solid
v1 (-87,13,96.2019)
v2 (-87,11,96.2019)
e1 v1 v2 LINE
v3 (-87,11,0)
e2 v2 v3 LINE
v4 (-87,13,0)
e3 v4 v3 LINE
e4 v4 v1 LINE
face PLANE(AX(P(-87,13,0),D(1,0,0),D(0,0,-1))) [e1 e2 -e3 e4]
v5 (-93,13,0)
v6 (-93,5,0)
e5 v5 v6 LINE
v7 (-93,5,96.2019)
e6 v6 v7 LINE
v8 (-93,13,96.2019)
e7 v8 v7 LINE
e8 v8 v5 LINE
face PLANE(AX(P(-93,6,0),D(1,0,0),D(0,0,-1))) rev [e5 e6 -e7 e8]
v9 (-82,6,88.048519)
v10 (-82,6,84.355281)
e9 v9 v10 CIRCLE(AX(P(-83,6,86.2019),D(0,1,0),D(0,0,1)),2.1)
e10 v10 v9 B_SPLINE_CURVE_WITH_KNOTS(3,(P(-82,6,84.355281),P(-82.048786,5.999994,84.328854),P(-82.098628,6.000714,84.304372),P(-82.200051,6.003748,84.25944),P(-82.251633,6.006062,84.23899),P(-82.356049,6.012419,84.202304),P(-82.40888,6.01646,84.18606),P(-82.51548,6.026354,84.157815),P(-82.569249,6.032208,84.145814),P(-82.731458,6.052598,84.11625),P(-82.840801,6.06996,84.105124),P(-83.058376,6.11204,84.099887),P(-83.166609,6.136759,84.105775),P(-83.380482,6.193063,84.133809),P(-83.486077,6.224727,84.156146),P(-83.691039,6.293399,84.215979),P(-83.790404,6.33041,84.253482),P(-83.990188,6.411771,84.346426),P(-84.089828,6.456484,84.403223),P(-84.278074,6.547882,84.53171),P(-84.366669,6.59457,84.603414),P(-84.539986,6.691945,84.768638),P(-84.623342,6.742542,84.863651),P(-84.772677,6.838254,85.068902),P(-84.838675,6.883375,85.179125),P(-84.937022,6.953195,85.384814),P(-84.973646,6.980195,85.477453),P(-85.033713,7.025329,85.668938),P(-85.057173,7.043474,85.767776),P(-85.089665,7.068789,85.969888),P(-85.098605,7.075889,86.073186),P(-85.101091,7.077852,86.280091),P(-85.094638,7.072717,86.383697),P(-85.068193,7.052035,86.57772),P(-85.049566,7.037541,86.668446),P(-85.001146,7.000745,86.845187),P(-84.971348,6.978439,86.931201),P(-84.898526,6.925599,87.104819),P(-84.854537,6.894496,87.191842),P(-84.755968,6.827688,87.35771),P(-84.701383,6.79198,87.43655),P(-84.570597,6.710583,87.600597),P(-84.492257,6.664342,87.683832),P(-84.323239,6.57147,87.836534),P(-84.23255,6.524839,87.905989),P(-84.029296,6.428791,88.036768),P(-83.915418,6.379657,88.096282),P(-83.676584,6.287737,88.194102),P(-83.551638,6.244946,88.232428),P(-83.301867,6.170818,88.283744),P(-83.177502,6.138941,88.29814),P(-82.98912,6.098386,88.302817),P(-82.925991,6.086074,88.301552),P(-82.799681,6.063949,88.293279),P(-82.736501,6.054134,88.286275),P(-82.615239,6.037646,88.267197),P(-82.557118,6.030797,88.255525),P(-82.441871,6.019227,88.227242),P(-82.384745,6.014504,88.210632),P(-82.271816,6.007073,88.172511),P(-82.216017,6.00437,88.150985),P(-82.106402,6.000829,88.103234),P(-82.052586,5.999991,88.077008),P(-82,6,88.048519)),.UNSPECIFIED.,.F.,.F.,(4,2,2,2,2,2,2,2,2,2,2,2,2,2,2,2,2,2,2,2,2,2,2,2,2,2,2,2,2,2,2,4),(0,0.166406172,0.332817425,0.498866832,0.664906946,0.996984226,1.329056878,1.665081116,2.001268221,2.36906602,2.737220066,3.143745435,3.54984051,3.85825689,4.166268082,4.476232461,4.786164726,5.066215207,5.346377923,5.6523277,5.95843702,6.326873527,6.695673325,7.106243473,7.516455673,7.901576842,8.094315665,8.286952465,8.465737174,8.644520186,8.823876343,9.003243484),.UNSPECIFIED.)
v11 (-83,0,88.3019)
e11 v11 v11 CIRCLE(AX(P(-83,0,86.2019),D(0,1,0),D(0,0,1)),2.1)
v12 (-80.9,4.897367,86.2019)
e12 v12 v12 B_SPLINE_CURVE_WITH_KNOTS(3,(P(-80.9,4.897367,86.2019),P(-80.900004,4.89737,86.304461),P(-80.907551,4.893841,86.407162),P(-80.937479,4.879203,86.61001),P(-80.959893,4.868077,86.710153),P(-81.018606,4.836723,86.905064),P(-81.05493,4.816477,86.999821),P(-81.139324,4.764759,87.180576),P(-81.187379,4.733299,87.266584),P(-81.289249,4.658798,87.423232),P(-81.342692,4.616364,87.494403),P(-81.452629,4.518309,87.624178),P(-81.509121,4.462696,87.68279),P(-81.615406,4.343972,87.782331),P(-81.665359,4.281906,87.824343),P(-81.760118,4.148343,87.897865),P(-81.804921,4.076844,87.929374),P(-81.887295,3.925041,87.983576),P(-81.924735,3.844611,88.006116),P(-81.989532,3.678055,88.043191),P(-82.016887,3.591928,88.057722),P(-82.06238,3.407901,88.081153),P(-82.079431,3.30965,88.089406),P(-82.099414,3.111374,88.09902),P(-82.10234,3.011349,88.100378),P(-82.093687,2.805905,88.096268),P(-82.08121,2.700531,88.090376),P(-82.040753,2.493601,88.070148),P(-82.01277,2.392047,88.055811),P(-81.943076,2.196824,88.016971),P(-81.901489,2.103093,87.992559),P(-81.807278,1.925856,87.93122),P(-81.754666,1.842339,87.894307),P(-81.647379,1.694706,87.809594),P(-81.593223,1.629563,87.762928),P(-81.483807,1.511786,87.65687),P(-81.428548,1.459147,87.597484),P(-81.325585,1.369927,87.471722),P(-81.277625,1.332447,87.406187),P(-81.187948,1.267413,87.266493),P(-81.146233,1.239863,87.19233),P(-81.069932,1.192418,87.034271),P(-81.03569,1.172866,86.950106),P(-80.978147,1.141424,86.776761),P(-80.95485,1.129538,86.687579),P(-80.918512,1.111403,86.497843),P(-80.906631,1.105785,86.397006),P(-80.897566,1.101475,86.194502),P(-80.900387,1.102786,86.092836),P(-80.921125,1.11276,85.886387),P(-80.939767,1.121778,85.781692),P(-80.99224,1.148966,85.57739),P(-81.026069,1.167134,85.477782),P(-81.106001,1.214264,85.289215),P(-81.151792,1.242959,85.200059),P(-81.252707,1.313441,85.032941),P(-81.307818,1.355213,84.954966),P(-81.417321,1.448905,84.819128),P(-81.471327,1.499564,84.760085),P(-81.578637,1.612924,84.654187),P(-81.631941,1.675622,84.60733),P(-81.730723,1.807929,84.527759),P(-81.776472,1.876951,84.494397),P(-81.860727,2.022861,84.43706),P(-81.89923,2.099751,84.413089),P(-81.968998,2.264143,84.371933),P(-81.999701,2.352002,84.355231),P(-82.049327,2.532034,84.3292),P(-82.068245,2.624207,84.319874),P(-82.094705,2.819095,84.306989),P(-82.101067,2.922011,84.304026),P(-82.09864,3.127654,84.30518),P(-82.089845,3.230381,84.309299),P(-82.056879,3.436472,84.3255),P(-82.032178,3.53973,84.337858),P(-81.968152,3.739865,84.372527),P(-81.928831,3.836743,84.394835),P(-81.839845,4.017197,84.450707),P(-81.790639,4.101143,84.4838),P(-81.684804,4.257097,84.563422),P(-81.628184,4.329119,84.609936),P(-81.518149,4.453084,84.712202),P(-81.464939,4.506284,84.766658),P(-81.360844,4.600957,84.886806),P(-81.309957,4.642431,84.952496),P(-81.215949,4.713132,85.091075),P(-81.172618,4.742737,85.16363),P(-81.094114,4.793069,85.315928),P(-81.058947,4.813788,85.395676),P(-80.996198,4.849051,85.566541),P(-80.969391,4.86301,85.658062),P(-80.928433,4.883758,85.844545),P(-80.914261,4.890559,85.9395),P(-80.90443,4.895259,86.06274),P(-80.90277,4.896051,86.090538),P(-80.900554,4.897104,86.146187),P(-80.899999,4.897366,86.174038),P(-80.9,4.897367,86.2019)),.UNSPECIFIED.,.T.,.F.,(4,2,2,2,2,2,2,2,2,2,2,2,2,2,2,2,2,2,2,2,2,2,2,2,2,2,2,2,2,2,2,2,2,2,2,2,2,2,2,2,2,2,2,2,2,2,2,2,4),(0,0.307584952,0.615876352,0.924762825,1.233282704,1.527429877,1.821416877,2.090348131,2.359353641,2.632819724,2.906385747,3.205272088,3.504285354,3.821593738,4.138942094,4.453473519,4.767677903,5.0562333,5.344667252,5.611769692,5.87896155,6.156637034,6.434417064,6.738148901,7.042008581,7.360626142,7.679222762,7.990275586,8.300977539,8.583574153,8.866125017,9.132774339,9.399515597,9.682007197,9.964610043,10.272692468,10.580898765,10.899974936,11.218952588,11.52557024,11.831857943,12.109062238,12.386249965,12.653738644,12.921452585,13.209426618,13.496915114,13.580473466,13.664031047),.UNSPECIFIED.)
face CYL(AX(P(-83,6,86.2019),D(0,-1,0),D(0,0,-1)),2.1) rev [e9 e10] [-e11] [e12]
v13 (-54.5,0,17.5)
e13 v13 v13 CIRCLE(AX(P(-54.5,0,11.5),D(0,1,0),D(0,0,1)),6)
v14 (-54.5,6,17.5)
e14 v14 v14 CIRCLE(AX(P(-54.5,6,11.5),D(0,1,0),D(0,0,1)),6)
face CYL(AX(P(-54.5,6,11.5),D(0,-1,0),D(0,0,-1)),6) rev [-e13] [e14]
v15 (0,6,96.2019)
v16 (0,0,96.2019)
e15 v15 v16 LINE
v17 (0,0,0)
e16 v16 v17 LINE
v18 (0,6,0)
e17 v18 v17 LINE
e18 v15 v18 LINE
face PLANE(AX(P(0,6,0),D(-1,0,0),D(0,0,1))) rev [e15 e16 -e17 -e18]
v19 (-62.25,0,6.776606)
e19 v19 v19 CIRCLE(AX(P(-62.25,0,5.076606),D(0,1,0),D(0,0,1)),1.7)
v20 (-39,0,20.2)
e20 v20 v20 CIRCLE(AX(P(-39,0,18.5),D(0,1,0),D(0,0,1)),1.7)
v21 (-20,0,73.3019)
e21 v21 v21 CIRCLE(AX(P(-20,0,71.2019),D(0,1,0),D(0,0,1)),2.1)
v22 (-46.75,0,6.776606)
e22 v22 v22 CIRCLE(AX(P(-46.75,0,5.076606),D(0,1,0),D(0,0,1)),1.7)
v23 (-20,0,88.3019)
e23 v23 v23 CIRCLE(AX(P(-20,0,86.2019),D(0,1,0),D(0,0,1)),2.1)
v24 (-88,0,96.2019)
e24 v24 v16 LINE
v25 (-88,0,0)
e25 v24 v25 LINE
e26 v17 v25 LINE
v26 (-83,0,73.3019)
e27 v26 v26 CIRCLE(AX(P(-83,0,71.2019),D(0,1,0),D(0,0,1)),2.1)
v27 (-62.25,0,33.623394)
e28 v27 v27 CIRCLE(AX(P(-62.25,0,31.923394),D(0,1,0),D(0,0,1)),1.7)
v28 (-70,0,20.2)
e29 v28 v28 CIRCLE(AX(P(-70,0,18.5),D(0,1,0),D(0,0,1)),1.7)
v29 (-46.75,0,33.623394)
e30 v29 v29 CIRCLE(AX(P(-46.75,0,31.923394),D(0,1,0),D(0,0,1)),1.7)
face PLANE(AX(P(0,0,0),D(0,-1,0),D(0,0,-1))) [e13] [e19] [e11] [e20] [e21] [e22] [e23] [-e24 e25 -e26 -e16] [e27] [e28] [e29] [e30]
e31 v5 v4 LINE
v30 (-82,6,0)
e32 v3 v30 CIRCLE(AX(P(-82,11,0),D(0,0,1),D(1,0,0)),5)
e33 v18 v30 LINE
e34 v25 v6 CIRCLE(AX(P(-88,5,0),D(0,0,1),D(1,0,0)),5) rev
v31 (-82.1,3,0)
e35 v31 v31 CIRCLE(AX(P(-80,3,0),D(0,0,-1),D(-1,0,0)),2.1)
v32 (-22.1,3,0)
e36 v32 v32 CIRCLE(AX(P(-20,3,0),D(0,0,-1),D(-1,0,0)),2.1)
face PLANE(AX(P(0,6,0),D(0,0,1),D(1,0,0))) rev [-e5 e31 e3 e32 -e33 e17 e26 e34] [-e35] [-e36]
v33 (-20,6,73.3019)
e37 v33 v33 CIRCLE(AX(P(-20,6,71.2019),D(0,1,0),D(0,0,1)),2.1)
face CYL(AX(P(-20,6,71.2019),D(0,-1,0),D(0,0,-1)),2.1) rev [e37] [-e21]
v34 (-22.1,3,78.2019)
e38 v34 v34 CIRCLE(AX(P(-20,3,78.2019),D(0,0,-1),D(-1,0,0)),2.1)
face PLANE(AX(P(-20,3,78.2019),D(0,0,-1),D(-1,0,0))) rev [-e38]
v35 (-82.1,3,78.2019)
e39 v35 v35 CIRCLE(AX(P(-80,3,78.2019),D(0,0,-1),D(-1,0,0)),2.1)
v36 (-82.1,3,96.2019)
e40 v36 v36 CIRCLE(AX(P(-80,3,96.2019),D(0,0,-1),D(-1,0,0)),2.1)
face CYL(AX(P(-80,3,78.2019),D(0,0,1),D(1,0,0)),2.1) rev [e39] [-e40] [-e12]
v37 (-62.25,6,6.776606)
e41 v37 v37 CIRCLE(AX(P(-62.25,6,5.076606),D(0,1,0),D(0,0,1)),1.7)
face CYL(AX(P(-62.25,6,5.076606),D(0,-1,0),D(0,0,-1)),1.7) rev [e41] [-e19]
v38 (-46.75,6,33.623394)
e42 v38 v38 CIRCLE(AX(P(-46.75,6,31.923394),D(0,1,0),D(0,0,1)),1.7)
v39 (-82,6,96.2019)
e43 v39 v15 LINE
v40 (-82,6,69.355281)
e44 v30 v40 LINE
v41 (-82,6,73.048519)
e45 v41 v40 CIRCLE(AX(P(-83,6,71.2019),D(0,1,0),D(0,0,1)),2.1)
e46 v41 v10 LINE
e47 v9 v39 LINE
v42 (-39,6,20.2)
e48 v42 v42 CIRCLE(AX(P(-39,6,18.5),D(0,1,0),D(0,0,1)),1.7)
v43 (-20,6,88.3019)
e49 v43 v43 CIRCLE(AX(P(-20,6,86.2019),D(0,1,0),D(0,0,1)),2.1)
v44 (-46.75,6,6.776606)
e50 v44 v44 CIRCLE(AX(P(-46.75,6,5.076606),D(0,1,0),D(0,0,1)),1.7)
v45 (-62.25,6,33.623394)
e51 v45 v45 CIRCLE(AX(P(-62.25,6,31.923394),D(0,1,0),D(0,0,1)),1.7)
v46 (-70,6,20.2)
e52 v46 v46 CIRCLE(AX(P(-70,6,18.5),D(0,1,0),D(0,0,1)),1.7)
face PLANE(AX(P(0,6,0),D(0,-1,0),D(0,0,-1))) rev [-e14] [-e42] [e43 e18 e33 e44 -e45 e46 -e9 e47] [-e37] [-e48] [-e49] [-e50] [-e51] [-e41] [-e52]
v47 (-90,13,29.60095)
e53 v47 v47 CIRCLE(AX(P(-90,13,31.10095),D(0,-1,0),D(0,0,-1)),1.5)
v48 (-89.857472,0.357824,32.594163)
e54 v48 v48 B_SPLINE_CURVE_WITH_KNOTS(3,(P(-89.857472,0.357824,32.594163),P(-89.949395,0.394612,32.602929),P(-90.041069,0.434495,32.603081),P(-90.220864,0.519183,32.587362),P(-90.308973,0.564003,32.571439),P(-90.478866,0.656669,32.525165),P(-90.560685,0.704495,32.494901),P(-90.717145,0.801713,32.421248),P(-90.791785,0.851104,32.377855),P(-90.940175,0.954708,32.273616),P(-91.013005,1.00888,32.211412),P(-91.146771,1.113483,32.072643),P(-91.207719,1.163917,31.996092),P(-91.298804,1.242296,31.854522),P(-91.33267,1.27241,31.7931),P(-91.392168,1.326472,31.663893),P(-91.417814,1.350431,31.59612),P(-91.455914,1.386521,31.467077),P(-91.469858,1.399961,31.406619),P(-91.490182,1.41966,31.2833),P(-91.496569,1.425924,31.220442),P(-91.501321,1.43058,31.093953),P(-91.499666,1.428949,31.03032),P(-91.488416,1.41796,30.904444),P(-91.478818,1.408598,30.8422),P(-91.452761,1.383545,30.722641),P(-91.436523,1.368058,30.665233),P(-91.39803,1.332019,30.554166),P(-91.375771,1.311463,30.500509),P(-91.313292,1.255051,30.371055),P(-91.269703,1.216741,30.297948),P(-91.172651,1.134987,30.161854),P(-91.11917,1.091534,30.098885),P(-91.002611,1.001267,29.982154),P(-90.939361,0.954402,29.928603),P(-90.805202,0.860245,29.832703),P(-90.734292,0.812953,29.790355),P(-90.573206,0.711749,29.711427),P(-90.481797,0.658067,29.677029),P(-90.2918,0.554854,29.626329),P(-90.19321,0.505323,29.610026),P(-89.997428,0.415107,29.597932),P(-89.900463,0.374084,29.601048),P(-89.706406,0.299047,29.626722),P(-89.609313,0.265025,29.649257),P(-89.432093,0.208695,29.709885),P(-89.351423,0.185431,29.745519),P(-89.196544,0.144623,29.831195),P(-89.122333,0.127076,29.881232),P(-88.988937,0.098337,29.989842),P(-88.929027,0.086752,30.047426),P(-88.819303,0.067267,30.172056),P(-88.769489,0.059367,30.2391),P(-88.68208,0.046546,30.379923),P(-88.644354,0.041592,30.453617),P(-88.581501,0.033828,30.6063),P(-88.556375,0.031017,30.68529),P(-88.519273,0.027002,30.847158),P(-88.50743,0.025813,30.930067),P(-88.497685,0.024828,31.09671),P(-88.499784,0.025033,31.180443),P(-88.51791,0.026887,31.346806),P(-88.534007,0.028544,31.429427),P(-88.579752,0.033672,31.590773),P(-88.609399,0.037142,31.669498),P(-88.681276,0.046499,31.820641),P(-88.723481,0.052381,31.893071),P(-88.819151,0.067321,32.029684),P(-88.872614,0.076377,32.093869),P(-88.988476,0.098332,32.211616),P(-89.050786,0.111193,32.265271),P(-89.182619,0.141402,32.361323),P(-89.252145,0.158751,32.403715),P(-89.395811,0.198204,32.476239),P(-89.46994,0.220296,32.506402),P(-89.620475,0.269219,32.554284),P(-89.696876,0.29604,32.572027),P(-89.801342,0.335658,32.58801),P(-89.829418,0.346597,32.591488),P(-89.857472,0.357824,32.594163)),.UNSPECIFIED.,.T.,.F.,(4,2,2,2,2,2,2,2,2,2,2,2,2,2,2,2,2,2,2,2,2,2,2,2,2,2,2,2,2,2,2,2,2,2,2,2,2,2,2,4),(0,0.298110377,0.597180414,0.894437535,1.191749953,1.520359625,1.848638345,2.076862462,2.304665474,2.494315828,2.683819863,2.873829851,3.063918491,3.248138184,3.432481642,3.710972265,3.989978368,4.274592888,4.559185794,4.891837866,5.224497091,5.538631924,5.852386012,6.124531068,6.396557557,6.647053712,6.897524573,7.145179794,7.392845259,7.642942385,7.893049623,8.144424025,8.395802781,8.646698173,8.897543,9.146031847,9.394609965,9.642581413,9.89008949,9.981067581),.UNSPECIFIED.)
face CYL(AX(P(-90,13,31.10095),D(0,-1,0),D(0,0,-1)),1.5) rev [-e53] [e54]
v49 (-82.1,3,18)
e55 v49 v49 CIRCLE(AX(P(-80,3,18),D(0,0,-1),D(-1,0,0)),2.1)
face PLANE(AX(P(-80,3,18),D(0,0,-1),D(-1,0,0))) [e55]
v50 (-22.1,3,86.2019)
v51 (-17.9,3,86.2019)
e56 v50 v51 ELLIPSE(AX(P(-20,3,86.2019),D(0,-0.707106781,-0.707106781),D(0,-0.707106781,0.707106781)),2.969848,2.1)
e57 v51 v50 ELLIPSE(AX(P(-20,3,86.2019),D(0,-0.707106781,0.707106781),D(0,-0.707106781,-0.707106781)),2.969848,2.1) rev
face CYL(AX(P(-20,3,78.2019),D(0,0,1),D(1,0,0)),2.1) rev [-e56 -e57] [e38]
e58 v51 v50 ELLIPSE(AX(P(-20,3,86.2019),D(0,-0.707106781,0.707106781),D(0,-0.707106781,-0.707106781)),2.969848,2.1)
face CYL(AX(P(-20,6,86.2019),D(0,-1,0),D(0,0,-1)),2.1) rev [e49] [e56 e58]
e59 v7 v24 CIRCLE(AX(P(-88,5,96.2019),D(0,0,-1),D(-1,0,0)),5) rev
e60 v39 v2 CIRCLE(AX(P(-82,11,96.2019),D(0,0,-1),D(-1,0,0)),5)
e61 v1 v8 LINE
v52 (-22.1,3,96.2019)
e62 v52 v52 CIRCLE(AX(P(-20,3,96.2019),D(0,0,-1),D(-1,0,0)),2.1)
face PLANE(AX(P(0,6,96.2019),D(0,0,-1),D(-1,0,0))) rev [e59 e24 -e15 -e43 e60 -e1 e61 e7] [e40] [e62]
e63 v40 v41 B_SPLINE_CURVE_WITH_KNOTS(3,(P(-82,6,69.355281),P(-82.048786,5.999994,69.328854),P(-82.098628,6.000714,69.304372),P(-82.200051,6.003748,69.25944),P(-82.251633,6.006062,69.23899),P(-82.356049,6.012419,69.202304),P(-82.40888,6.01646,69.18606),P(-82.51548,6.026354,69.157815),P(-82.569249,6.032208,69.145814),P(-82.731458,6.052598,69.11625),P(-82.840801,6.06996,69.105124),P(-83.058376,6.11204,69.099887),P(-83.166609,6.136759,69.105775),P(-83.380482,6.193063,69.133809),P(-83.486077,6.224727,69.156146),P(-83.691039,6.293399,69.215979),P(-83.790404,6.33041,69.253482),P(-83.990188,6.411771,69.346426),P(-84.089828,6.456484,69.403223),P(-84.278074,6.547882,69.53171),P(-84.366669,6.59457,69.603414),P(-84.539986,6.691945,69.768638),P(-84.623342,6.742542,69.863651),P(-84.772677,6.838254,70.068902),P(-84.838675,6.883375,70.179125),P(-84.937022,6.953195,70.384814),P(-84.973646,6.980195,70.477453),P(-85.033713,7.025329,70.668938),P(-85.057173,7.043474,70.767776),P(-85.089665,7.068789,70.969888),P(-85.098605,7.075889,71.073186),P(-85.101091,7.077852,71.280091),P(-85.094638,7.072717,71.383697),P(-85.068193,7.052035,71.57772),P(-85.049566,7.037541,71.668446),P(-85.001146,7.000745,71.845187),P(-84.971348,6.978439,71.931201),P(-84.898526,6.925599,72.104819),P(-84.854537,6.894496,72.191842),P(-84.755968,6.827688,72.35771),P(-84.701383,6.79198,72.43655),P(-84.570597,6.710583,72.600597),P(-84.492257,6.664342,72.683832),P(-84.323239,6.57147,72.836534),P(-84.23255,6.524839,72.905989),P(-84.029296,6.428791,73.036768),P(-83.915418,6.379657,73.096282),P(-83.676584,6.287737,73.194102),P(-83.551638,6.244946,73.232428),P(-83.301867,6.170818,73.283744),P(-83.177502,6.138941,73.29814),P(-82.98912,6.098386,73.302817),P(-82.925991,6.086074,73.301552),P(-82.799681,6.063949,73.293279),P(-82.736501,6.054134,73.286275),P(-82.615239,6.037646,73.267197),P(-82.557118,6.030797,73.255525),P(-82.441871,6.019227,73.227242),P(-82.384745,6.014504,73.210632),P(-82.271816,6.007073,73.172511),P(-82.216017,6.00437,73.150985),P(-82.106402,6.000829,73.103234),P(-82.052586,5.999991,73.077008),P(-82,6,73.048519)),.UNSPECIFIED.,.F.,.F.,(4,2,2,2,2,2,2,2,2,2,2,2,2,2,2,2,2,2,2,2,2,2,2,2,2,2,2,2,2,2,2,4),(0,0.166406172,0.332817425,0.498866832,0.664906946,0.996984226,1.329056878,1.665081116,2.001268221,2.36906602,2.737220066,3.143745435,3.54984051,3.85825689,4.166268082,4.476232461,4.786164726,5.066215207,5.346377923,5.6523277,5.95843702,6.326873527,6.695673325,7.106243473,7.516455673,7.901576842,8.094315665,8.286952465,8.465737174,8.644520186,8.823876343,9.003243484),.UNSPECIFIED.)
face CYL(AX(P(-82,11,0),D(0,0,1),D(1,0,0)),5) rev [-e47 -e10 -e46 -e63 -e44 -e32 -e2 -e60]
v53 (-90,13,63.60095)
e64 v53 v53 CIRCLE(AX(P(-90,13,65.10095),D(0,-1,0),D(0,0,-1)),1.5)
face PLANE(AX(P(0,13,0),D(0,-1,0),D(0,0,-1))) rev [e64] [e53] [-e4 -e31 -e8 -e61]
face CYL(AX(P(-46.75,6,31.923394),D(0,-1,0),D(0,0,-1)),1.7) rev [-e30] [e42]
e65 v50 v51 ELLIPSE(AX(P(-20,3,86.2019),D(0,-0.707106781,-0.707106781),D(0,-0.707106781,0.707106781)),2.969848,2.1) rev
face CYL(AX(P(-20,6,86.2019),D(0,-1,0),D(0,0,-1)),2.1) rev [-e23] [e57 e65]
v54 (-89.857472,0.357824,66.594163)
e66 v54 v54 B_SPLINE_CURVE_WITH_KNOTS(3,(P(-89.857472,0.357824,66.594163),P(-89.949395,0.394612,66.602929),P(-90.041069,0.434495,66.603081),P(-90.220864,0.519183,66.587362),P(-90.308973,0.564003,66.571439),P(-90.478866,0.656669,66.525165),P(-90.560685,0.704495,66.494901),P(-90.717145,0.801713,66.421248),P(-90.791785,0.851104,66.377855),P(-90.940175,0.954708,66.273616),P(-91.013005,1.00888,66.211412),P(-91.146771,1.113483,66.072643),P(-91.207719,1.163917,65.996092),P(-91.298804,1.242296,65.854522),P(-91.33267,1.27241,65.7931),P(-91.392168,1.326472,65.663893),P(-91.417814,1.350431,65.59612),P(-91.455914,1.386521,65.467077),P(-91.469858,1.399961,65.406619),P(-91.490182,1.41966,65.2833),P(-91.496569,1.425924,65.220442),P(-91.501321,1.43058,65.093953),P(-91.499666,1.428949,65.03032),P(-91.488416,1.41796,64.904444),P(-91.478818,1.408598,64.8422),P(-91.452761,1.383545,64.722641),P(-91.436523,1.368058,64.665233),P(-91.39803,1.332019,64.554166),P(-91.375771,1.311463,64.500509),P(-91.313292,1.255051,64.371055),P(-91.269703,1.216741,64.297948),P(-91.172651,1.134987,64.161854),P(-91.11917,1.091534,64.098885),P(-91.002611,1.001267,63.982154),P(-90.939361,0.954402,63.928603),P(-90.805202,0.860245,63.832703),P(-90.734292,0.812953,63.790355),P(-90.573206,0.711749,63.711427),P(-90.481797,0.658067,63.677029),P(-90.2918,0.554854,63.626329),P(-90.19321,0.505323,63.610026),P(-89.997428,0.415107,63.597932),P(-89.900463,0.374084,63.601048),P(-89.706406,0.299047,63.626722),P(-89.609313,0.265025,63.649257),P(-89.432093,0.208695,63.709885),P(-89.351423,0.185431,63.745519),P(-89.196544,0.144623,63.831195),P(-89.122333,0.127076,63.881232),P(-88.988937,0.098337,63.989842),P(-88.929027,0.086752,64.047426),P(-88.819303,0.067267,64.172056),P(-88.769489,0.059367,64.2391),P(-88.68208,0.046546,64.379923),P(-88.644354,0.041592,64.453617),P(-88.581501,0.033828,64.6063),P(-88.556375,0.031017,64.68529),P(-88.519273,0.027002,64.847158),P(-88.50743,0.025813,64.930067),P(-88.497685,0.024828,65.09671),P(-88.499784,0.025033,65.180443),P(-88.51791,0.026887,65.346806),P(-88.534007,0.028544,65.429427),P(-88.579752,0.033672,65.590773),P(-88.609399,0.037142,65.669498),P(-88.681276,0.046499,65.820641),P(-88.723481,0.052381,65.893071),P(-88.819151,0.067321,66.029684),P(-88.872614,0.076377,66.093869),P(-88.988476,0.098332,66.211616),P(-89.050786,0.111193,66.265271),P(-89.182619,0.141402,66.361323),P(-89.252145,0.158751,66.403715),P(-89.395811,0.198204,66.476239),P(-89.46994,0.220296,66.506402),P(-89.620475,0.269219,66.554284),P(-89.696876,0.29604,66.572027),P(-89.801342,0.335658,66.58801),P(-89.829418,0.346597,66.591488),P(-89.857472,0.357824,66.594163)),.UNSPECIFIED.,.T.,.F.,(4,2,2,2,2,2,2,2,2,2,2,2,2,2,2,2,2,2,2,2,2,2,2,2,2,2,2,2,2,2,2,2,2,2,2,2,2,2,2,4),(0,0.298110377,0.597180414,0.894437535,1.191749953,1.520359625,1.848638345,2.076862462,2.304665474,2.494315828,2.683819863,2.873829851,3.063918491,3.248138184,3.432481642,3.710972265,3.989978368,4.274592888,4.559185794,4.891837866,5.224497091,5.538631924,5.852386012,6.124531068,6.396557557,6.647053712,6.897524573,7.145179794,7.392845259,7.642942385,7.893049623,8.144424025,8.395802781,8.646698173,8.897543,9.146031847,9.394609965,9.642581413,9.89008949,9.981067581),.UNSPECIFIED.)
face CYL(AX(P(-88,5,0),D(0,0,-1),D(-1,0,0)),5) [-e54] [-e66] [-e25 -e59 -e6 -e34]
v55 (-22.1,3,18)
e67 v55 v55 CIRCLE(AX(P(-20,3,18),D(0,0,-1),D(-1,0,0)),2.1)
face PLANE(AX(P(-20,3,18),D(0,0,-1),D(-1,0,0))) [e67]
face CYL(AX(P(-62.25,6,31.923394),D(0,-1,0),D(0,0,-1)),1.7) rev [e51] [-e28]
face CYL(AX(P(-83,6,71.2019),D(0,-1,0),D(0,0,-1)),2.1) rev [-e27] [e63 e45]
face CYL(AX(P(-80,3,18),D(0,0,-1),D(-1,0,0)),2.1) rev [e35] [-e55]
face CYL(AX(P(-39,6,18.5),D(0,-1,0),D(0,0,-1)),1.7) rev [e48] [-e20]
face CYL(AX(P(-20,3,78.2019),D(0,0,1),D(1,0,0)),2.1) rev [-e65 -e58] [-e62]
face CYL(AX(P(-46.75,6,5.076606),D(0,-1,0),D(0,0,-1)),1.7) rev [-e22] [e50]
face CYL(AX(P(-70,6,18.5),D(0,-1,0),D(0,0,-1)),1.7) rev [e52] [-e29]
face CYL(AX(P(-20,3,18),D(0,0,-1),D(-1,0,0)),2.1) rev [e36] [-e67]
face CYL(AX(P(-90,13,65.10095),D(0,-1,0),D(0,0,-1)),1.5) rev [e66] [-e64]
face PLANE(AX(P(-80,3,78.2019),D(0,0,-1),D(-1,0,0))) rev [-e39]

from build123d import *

# Parameters (mm, degrees)
SKETCH1_W           = 93
SKETCH1_H           = 96.2019
SKETCH1_R           = 6
SKETCH1_R_2         = 1.7
SKETCH1_R_3         = 2.1
BOSS_EXTRUDE1_DEPTH = 6
BOSS_EXTRUDE2_START = -6
SKETCH2_W           = 6
SKETCH2_H           = 96.2019
SKETCH2_R           = 1.5
BOSS_EXTRUDE2_DEPTH = 7
SKETCH2_3_R         = 1.5
CUT_EXTRUDE2_DEPTH  = 135.435135153
SKETCH3_R           = 2.1
CUT_EXTRUDE3_DEPTH  = 18
CUT_EXTRUDE4_START  = -78.2019
SKETCH3_2_R         = 2.1
CUT_EXTRUDE4_DEPTH  = 18
FILLET1_R           = 5


with BuildPart() as part:
    # Sketch1 → Boss-Extrude1 (new body)
    with BuildSketch(Plane(origin=(0, 0, 0), x_dir=(-1, 0, 0), z_dir=(0, 1, 0))):
        with Locations((46.5, 48.10095)):
            Rectangle(SKETCH1_W, SKETCH1_H)
        with Locations(Location((54.5, 11.5, 0), (0, 0, 90))):
            Circle(SKETCH1_R, mode=Mode.SUBTRACT)
        with Locations(Location((39, 18.5, 0), (0, 0, 90))):
            Circle(SKETCH1_R_2, mode=Mode.SUBTRACT)
        with Locations(Location((46.75, 31.923393759, 0), (0, 0, 90))):
            Circle(SKETCH1_R_2, mode=Mode.SUBTRACT)
        with Locations(Location((62.25, 31.923393759, 0), (0, 0, 90))):
            Circle(SKETCH1_R_2, mode=Mode.SUBTRACT)
        with Locations(Location((70, 18.5, 0), (0, 0, 90))):
            Circle(SKETCH1_R_2, mode=Mode.SUBTRACT)
        with Locations(Location((62.25, 5.076606241, 0), (0, 0, 90))):
            Circle(SKETCH1_R_2, mode=Mode.SUBTRACT)
        with Locations(Location((46.75, 5.076606241, 0), (0, 0, 90))):
            Circle(SKETCH1_R_2, mode=Mode.SUBTRACT)
        with Locations(Location((20, 86.2019, 0), (0, 0, 90))):
            Circle(SKETCH1_R_3, mode=Mode.SUBTRACT)
        with Locations(Location((83, 86.2019, 0), (0, 0, 90))):
            Circle(SKETCH1_R_3, mode=Mode.SUBTRACT)
        with Locations(Location((83, 71.2019, 0), (0, 0, 90))):
            Circle(SKETCH1_R_3, mode=Mode.SUBTRACT)
        with Locations(Location((20, 71.2019, 0), (0, 0, 90))):
            Circle(SKETCH1_R_3, mode=Mode.SUBTRACT)
    extrude(amount=BOSS_EXTRUDE1_DEPTH)

    # Sketch2 → Boss-Extrude2 (add)
    with BuildSketch(Plane(origin=(0, 0, 0), x_dir=(-1, 0, 0), z_dir=(0, -1, 0)).offset(BOSS_EXTRUDE2_START)):
        with Locations((90, -48.10095)):
            Rectangle(SKETCH2_W, SKETCH2_H)
        with Locations(Location((90, -65.10095, 0), (0, 0, 90))):
            Circle(SKETCH2_R, mode=Mode.SUBTRACT)
        with Locations(Location((90, -31.10095, 0), (0, 0, 90))):
            Circle(SKETCH2_R, mode=Mode.SUBTRACT)
    extrude(amount=-BOSS_EXTRUDE2_DEPTH)

    # Sketch2<3> → Cut-Extrude2 (cut, through all)
    with BuildSketch(Plane(origin=(0, 0, 0), x_dir=(-1, 0, 0), z_dir=(0, -1, 0))):
        with Locations(Location((90, -31.10095, 0), (0, 0, 90))):
            Circle(SKETCH2_3_R)
        with Locations(Location((90, -65.10095, 0), (0, 0, 90))):
            Circle(SKETCH2_3_R)
    extrude(amount=-CUT_EXTRUDE2_DEPTH, mode=Mode.SUBTRACT)

    # Sketch3 → Cut-Extrude3 (cut)
    with BuildSketch(Plane(origin=(0, 0, 0), x_dir=(1, 0, 0), z_dir=(0, 0, -1))):
        with Locations(Location((-80, -3, 0), (0, 0, 180))):
            Circle(SKETCH3_R)
        with Locations(Location((-20, -3, 0), (0, 0, 180))):
            Circle(SKETCH3_R)
    extrude(amount=-CUT_EXTRUDE3_DEPTH, mode=Mode.SUBTRACT)

    # Sketch3<2> → Cut-Extrude4 (cut)
    with BuildSketch(Plane(origin=(0, 0, 0), x_dir=(1, 0, 0), z_dir=(0, 0, -1)).offset(CUT_EXTRUDE4_START)):
        with Locations(Location((-80, -3, 0), (0, 0, 180))):
            Circle(SKETCH3_2_R)
        with Locations(Location((-20, -3, 0), (0, 0, 180))):
            Circle(SKETCH3_2_R)
    extrude(amount=-CUT_EXTRUDE4_DEPTH, mode=Mode.SUBTRACT)

    # Fillet1
    # the kernel refuses this fillet: 5 mm, written as the material it adds along each edge
    with BuildSketch(Plane(origin=(-87, 6, 96.2019), x_dir=(1, 0, 0), z_dir=(0, 0, -1))) as fillet1_piece_1_section:
        with BuildLine():
            CenterArc((FILLET1_R, -FILLET1_R), FILLET1_R, 90, 90)
            Line((0, -FILLET1_R), (0, 0))
            Line((0, 0), (FILLET1_R, 0))
        make_face()
    fillet1_piece_1 = extrude(amount=96.2019, mode=Mode.PRIVATE)
    fillet1_piece_1 = fillet1_piece_1 - Plane(origin=(-83, 7.144811059, 71.2019), x_dir=(0, 0, 1), z_dir=(0, -1, 0)) * Cylinder(2.1, 213, mode=Mode.PRIVATE)
    fillet1_piece_1 = fillet1_piece_1 - Plane(origin=(-83, 7.144811059, 86.2019), x_dir=(0, 0, 1), z_dir=(0, -1, 0)) * Cylinder(2.1, 213, mode=Mode.PRIVATE)
    add(fillet1_piece_1)
    # the kernel refuses this fillet: 5 mm, written as the material it takes off along each edge
    with BuildSketch(Plane(origin=(-93, 0, -12.5), x_dir=(1, 0, 0), z_dir=(0, 0, 1))) as fillet1_2_piece_1:
        with BuildLine():
            CenterArc((FILLET1_R, FILLET1_R), FILLET1_R, 180, 90)
            Line((0, FILLET1_R), (0, 0))
            Line((0, 0), (FILLET1_R, 0))
        make_face()
    extrude(amount=121.2019, mode=Mode.SUBTRACT)


solid = part.part
